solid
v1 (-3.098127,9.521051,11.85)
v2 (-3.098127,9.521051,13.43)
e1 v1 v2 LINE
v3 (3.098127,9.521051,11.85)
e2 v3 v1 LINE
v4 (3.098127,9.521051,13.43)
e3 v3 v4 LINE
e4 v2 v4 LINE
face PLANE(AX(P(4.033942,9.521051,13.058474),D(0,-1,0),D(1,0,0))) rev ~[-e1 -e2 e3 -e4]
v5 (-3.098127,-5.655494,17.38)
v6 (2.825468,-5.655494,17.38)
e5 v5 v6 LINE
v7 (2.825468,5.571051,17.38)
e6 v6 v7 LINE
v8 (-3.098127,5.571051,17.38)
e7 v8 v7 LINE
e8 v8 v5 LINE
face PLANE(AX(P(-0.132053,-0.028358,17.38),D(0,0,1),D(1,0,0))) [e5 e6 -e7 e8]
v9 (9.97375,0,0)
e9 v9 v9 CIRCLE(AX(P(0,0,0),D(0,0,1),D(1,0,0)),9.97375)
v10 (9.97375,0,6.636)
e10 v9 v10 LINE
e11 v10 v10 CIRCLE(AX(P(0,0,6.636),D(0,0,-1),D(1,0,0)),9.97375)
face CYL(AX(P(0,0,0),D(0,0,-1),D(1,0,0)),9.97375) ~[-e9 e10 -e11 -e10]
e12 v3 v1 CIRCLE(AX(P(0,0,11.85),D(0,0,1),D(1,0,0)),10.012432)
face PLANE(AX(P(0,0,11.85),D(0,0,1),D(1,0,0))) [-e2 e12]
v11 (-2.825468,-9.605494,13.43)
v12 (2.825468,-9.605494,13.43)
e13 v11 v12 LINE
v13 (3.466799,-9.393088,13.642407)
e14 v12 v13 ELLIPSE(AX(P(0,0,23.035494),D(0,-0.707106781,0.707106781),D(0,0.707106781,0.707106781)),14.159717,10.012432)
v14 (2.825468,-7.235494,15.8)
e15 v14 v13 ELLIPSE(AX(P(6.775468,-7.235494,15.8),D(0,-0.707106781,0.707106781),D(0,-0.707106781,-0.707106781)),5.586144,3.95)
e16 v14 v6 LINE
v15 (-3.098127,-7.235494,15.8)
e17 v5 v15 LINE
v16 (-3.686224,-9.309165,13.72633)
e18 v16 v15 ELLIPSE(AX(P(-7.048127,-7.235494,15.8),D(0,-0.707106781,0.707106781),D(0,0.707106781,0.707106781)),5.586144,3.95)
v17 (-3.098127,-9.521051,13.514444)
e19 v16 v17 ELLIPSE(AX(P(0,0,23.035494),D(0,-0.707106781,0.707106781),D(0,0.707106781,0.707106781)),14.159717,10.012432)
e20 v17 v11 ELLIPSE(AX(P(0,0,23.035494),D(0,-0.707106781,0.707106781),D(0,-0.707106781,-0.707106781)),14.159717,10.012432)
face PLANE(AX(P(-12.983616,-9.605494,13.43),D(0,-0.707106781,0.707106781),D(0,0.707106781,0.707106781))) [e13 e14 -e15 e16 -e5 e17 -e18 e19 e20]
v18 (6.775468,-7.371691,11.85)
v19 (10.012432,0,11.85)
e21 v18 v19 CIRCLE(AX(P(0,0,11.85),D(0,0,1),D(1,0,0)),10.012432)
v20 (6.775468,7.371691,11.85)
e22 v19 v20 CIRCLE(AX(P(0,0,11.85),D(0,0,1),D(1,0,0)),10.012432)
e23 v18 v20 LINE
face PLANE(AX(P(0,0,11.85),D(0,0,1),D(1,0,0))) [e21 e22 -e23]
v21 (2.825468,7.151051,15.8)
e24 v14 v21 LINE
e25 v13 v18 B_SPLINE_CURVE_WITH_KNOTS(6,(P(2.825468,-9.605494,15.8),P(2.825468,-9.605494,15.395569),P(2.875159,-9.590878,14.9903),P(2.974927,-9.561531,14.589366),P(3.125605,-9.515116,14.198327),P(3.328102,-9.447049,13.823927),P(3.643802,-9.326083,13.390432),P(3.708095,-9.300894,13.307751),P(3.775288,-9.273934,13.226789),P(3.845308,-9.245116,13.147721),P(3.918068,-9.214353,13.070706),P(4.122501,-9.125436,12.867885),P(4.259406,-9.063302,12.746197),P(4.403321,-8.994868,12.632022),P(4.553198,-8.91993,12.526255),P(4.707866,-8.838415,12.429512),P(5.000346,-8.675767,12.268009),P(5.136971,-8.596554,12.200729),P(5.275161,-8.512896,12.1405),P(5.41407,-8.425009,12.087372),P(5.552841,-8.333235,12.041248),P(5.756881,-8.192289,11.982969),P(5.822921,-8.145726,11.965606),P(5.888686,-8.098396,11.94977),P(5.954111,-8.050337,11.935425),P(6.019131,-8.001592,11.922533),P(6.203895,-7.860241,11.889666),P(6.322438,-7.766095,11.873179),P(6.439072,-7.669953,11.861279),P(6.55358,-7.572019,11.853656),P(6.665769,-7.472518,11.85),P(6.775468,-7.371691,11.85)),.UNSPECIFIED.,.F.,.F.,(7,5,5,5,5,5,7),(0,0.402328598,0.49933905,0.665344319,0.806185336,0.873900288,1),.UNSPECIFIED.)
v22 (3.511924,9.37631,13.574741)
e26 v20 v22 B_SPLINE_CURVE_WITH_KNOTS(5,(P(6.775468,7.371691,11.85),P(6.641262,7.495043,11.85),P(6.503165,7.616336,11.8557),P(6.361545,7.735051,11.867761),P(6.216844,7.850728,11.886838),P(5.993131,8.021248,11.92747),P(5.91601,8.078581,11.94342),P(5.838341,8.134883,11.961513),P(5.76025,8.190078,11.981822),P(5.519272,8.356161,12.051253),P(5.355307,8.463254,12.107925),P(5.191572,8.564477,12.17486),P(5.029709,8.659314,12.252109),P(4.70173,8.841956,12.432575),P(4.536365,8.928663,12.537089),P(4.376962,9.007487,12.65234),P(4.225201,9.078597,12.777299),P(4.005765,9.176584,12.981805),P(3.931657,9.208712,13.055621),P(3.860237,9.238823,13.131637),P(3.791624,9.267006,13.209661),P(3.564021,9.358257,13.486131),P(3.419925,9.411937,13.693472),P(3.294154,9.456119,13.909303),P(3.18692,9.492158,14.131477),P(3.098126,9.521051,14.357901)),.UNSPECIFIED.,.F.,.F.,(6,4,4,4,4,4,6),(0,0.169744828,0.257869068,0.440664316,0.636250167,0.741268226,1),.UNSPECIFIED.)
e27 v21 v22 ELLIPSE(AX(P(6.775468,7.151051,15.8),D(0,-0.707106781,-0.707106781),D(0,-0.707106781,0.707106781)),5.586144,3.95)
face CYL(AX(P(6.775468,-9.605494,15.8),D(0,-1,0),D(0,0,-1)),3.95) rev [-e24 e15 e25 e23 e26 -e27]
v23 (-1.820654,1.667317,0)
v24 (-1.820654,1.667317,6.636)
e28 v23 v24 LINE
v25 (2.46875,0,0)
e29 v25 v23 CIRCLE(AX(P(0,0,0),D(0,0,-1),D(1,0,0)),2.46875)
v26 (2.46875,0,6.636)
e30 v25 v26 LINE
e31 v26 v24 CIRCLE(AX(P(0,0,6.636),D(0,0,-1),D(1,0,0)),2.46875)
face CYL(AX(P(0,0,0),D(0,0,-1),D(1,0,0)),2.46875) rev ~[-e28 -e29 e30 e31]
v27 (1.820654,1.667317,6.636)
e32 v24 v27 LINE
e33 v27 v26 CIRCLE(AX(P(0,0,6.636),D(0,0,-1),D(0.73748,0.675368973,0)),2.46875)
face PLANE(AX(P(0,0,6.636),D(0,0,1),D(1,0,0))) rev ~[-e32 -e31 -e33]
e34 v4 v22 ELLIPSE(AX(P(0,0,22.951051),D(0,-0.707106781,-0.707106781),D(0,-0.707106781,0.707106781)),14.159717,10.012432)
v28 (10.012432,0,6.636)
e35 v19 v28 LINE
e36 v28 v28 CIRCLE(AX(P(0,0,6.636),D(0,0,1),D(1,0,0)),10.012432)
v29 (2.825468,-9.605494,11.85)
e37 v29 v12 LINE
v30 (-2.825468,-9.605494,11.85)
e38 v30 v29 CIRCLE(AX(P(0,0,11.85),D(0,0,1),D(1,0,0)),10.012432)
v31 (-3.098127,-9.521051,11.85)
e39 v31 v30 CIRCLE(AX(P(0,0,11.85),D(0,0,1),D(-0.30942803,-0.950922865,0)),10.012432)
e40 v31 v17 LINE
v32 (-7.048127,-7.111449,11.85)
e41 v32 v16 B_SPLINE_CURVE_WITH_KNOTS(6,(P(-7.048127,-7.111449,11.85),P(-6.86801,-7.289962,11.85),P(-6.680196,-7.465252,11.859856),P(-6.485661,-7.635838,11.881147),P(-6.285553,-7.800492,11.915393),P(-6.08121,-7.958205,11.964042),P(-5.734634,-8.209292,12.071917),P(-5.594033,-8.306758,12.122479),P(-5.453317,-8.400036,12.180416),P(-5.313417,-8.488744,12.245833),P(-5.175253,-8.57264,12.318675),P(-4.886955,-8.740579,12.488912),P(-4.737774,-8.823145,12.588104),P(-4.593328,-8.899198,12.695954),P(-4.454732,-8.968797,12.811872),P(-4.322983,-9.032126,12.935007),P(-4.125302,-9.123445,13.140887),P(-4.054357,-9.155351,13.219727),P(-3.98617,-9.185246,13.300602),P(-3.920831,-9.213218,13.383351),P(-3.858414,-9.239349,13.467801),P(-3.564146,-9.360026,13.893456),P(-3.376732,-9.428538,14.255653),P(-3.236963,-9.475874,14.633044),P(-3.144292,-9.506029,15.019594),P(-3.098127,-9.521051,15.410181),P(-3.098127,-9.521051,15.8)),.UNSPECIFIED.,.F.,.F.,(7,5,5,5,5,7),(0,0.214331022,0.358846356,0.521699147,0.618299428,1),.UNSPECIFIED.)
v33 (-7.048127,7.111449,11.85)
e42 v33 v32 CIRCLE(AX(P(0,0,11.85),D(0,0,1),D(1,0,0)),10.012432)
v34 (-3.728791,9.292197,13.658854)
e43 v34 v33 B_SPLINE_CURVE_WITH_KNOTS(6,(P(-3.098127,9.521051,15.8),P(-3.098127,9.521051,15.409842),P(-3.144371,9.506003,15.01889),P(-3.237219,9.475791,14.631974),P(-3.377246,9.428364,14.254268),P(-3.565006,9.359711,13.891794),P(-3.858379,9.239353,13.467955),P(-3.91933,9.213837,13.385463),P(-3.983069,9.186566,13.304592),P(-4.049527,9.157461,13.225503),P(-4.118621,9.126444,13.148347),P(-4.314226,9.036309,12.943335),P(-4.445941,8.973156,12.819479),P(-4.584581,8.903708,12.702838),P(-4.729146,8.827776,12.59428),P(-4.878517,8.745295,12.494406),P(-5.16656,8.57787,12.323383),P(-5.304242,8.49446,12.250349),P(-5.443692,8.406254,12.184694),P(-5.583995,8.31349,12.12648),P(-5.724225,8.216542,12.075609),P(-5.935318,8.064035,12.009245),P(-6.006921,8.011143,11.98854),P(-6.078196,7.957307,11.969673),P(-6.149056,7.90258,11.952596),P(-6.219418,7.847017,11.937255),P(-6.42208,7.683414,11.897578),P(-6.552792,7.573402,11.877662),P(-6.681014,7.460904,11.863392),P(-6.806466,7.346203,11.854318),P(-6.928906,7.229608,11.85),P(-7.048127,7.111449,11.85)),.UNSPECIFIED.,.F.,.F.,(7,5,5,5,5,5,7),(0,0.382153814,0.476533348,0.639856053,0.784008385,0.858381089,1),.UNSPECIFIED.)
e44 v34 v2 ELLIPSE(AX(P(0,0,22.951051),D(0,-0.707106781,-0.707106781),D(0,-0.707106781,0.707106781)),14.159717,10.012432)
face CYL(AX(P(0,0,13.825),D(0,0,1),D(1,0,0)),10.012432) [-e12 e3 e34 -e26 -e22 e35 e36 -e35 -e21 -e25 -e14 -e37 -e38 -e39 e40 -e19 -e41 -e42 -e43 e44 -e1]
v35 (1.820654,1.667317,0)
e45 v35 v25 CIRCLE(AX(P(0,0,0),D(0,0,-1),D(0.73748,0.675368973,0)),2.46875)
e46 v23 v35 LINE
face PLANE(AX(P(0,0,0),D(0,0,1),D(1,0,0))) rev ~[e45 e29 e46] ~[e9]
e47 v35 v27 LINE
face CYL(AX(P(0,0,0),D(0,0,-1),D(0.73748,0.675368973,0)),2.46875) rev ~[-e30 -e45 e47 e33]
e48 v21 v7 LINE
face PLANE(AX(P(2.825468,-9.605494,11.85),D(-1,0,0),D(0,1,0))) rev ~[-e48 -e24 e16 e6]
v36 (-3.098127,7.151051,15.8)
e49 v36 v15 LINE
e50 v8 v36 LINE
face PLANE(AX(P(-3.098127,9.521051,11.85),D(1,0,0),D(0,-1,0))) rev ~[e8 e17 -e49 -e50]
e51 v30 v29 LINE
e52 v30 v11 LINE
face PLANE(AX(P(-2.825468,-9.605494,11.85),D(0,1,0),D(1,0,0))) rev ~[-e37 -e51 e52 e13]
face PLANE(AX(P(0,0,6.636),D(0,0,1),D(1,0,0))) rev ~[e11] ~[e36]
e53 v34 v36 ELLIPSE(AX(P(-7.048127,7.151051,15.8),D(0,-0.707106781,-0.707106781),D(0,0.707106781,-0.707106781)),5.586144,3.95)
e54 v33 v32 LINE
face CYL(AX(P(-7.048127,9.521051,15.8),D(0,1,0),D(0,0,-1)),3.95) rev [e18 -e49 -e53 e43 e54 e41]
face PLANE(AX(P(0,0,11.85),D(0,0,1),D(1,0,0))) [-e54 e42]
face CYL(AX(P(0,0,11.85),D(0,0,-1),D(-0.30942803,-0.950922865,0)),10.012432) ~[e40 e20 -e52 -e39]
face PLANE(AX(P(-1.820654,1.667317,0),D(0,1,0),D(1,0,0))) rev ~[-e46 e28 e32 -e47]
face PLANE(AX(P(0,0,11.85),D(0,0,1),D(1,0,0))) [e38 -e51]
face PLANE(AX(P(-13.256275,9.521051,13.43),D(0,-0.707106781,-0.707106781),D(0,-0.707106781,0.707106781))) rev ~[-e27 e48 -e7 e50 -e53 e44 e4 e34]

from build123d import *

# Parameters (mm, degrees)
F0_R         = 12.625
F0_R_2       = 10.375
F0_R_3       = 5
F1_DEPTH     = 15
F2_DEPTH     = 15
F3_R         = 12.6739646699
F4_DEPTH     = 6.6
F6_DEPTH     = 7
F7_T4_DEPTH  = 36.6039255786
F7_S5_R      = 12.6739646699
F7_T6_DEPTH  = 20
F7_T10_DEPTH = 24.210816556
F7_S11_R     = 12.6739646699
F7_T12_DEPTH = 14
F8_T1_DEPTH  = 32.8699146781
F9_T1_DEPTH  = 33.2150521969
F10_SCALE    = 0.79


# Not quite as in the source:
# - a fillet or chamfer that OpenCascade refuses, or shapes differently, is made with other operations: its cross-section is extruded or revolved along the edge and cut away or added
# - a feature names something its author has since deleted; it is built from what else it names


with BuildPart() as f1:
    # F0 (on Top) → F1 (new body)
    with BuildSketch(Plane.XY):
        Circle(F0_R)
        Circle(F0_R_2, mode=Mode.SUBTRACT)
        Circle(F0_R_2)
        Circle(F0_R_3, mode=Mode.SUBTRACT)
    extrude(amount=F1_DEPTH)

    # F0 (on Top) → F2 (join)
    with BuildSketch(Plane.XY):
        Circle(F0_R_3)
        with BuildLine():
            ThreePointArc((2.304625, 2.1105280404), (2.9126944678, 1.1321819366), (3.125, 0))
            ThreePointArc((3.125, 0), (-1.1321819366, -2.9126944678), (-2.304625, 2.1105280404))
            ThreePointArc((-2.304625, 2.1105280404), (0, 3.125), (2.304625, 2.1105280404))
        make_face(mode=Mode.SUBTRACT)
        with BuildLine():
            Line((-2.304625, 2.1105280404), (2.304625, 2.1105280404))
            ThreePointArc((2.304625, 2.1105280404), (0, 3.125), (-2.304625, 2.1105280404))
        make_face()
    extrude(amount=F2_DEPTH)

    # F3 (on face) → F4 (join)
    with BuildSketch(Plane.XY.offset(15)):
        Circle(F3_R)
    extrude(amount=-F4_DEPTH)

    # F5 (on face) → F6 (join)
    with BuildSketch(Plane.XY.offset(15)):
        with BuildLine():
            Line((3.5765423992, 12.0519627893), (-3.921679918, 12.0519627893))
            Line((-3.921679918, 12.0519627893), (-3.921679918, -12.0519627893))
            ThreePointArc((-3.921679918, -12.0519627893), (-3.7494920856, -12.1066382433), (-3.5765423992, -12.1588537667))
            Line((-3.5765423992, -12.1588537667), (3.5765423992, -12.1588537667))
            Line((3.5765423992, -12.1588537667), (3.5765423992, 12.0519627893))
        make_face()
    extrude(amount=F6_DEPTH)

    # F7: fillet of radius 5 on 2 edges, made by hand


with BuildPart() as f7_tool2:
    # F7_s3 → F7_t4 (new body)
    with BuildSketch(Plane.XZ.offset(-12.0519627893)):
        with BuildLine():
            ThreePointArc((-8.921679918, 15), (-5.3861460121, 16.4644660941), (-3.921679918, 20))
            Line((-3.921679918, 20), (-3.921679918, 15))
            Line((-3.921679918, 15), (-8.921679918, 15))
        make_face()
    extrude(amount=F7_T4_DEPTH)

    # F7_s5 → F7_t6 (intersect, symmetric)
    with BuildSketch(Plane.XY.offset(17.5)):
        Circle(F7_S5_R)
    extrude(amount=F7_T6_DEPTH, both=True, mode=Mode.INTERSECT)


with BuildPart() as f1_1:
    add(f1.part)

    # F7_t1: union F7_tool2
    add(f7_tool2.part)


with BuildPart() as f7_tool8:
    # F7_s9 → F7_t10 (new body)
    with BuildSketch(Plane.XZ.offset(12.1588537667)):
        with BuildLine():
            ThreePointArc((8.5765423992, 15), (5.0410084933, 16.4644660941), (3.5765423992, 20))
            Line((3.5765423992, 20), (3.5765423992, 15))
            Line((3.5765423992, 15), (8.5765423992, 15))
        make_face()
    extrude(amount=-F7_T10_DEPTH)

    # F7_s11 → F7_t12 (intersect, symmetric)
    with BuildSketch(Plane.XY.offset(17.5)):
        Circle(F7_S11_R)
    extrude(amount=F7_T12_DEPTH, both=True, mode=Mode.INTERSECT)


with BuildPart() as f1_2:
    add(f1_1.part)

    # F7_t7: union F7_tool8
    add(f7_tool8.part)

    # F8: chamfer of 5 on 1 edges, made by hand

    # F8_s2 → F8_t1 (cut)
    with BuildSketch(Plane.YZ.offset(-16.434957339)):
        Polygon((-12.1588537667, 17), (-7.1588537667, 22), (-12.1588537667, 22), align=None)
    extrude(amount=F8_T1_DEPTH, mode=Mode.SUBTRACT)

    # F9: chamfer of 5 on 1 edges, made by hand

    # F9_s2 → F9_t1 (cut)
    with BuildSketch(Plane.YZ.offset(-16.7800948578)):
        Polygon((12.0519627893, 17), (7.0519627893, 22), (12.0519627893, 22), align=None)
    extrude(amount=F9_T1_DEPTH, mode=Mode.SUBTRACT)


with BuildPart() as f1_3:
    # F10: moved
    add(f1_2.part.scale(F10_SCALE))


solid = f1_3.part
